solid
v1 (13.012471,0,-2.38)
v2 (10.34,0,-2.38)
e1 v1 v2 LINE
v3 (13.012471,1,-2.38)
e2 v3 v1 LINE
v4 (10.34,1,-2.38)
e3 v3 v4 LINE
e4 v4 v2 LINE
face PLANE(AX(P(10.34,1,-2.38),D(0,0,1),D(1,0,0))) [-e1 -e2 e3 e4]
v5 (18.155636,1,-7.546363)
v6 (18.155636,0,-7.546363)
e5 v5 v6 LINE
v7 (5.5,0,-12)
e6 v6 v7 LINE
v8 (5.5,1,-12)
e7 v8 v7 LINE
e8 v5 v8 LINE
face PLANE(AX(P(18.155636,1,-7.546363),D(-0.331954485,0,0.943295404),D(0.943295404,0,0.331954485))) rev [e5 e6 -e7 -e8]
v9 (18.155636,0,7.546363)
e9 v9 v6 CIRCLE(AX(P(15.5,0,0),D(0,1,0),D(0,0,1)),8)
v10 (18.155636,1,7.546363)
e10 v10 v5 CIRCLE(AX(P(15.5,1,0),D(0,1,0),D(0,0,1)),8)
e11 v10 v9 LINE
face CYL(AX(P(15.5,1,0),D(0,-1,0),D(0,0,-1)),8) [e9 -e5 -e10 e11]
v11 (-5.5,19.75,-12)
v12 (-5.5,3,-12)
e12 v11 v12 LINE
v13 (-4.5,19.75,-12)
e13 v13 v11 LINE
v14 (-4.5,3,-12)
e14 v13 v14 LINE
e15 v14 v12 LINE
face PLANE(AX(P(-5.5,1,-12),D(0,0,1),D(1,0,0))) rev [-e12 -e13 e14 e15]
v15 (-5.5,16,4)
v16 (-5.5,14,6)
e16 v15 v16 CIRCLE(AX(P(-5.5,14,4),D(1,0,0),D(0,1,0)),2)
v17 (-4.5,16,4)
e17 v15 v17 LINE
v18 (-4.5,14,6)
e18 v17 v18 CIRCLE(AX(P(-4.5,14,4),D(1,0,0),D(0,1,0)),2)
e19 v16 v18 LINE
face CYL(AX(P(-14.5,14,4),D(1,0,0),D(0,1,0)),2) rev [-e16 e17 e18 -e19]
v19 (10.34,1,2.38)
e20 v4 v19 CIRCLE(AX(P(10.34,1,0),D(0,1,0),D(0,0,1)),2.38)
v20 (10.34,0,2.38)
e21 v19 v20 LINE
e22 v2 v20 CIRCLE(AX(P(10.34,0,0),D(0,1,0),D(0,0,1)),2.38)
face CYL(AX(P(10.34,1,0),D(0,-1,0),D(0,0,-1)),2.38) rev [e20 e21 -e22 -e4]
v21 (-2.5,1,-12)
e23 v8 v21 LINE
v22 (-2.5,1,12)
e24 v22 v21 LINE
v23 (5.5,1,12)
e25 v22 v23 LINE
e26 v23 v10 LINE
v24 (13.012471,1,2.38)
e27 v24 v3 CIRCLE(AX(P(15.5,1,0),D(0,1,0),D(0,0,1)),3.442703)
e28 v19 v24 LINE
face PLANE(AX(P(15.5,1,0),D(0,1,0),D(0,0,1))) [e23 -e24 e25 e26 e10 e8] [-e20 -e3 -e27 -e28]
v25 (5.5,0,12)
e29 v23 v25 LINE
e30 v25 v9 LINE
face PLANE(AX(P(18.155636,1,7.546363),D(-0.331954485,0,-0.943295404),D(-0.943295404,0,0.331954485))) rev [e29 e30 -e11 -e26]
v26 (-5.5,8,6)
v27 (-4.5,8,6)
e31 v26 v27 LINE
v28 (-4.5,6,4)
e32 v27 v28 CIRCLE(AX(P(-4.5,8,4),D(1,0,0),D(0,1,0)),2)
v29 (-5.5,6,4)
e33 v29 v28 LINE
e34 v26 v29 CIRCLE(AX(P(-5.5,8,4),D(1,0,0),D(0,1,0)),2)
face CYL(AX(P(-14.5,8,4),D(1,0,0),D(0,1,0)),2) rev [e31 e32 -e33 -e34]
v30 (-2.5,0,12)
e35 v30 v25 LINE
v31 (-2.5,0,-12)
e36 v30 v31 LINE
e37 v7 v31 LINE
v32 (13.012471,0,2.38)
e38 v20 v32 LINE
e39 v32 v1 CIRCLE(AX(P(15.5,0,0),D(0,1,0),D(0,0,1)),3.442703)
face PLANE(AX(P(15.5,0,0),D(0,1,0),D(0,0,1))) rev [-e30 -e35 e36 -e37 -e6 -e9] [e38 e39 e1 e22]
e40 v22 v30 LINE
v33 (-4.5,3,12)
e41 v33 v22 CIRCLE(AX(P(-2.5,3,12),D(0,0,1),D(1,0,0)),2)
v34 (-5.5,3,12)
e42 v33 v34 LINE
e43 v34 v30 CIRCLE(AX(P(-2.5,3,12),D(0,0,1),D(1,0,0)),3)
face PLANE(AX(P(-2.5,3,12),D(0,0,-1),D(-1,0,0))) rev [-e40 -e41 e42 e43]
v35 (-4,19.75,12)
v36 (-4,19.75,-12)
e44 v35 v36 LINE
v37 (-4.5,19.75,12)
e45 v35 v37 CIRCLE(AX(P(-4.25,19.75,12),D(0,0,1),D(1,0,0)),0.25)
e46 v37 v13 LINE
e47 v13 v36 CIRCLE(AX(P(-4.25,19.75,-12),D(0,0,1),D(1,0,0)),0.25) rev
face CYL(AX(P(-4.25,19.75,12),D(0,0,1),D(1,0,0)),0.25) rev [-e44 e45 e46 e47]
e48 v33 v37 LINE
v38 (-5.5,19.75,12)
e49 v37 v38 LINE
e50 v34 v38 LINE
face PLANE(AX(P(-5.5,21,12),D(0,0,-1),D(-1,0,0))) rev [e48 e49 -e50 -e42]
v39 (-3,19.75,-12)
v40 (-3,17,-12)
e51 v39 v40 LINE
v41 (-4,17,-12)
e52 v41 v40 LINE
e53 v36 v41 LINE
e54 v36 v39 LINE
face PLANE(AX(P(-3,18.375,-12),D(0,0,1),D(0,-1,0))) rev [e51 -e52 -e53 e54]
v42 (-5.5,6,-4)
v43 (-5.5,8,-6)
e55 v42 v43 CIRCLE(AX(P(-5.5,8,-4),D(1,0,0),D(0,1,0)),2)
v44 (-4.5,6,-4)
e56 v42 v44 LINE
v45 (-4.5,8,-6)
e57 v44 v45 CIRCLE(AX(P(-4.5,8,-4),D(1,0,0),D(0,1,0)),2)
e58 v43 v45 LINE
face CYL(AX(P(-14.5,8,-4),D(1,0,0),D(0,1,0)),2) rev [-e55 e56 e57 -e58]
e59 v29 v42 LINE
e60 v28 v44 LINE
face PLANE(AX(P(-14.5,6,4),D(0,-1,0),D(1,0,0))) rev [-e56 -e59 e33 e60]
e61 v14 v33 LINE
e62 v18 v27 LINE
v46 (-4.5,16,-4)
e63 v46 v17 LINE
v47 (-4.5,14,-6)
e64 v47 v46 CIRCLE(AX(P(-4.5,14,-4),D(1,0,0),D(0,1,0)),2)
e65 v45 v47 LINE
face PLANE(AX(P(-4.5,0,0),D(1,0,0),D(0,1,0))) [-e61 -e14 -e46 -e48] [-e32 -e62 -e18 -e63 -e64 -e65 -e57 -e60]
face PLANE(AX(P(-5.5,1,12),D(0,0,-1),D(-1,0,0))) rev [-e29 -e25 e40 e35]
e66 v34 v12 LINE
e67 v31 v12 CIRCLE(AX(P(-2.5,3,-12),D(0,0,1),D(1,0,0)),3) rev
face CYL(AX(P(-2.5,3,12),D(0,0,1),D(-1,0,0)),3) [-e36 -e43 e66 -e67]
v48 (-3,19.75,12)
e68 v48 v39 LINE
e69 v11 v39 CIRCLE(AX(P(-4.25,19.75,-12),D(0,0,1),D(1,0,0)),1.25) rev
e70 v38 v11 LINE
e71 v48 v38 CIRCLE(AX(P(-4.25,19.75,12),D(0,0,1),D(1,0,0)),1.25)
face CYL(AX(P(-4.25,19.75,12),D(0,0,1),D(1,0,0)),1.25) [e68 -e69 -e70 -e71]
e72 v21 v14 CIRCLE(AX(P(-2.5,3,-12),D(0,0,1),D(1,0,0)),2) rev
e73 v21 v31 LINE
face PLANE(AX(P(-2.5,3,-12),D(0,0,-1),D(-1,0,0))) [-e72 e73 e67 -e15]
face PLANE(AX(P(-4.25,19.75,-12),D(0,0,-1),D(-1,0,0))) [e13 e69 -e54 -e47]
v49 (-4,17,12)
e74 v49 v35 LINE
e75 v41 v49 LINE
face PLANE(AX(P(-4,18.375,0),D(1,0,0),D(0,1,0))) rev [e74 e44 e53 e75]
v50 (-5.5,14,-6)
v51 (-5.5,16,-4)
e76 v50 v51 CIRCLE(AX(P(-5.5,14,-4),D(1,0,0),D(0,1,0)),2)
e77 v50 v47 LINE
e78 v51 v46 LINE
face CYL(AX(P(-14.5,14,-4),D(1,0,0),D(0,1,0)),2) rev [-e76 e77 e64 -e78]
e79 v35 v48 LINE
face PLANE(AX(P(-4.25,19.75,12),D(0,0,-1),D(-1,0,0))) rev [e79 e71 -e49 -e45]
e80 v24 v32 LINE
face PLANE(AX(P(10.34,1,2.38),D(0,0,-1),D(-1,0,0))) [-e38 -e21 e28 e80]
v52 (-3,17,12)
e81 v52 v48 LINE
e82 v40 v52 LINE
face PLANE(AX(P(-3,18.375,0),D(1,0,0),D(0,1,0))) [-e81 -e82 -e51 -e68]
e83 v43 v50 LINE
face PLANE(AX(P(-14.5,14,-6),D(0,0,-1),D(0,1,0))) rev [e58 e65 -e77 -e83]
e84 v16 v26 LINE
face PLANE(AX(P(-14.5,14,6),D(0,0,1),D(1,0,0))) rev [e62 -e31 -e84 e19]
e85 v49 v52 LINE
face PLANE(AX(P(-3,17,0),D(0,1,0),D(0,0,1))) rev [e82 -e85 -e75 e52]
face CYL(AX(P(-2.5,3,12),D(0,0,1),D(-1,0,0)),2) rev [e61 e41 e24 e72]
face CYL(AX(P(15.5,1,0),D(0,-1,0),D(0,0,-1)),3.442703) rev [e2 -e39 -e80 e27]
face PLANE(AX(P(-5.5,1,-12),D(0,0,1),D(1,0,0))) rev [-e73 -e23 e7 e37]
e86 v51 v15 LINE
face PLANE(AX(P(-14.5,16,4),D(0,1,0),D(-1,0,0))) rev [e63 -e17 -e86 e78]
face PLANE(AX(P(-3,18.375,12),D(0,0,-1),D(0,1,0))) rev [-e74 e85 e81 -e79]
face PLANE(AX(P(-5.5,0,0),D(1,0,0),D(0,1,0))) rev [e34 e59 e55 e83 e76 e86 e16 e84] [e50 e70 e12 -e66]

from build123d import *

# Parameters (mm, degrees)
BASE_FLANGE1_DEPTH           = 1
EDGE_FLANGE1_STRIP_W         = 8
EDGE_FLANGE1_STRIP_H         = 1
EDGE_FLANGE1_STRIP_CUT_DEPTH = 24
EDGE_FLANGE1_DEPTH           = 24
HEM1_START                   = -12
HEM1_DEPTH                   = 24
HEM1_2_DEPTH                 = 24
CUT_EXTRUDE1_DEPTH           = 10


# Read off the part's stored shape, not the designer's step: Hem1
# Sheet-metal steps are written as plain solids
with BuildPart() as part:
    # Sketch1 → Base-Flange1 (new body)
    with BuildSketch(Plane(origin=(0, 0, 0), x_dir=(1, 0, 0), z_dir=(0, 1, 0))):
        with BuildLine():
            Line((-5.5, 12), (5.5, 12))
            Line((5.5, 12), (18.155635881, 7.546363234))
            ThreePointArc((18.155635881, 7.546363234), (23.5, 0), (18.155635881, -7.546363234))
            Line((18.155635881, -7.546363234), (5.5, -12))
            Line((5.5, -12), (-5.5, -12))
            Line((-5.5, -12), (-5.5, 12))
        make_face()
        with BuildLine():
            Line((10.34, 2.38), (13.012470906, 2.38))
            ThreePointArc((13.012470906, 2.38), (18.942702571, 0), (13.012470906, -2.38))
            Line((13.012470906, -2.38), (10.34, -2.38))
            ThreePointArc((10.34, -2.38), (7.96, 0), (10.34, 2.38))
        make_face(mode=Mode.SUBTRACT)
    extrude(amount=BASE_FLANGE1_DEPTH)

    # Edge-Flange1 strip (across the edge) → Edge-Flange1 strip cut (cut)
    with BuildSketch(Plane(origin=(-5.5, 1, -12), x_dir=(1, 0, 0), z_dir=(0, 0, 1))):
        with Locations((-1, -0.5)):
            Rectangle(EDGE_FLANGE1_STRIP_W, EDGE_FLANGE1_STRIP_H)
    extrude(amount=EDGE_FLANGE1_STRIP_CUT_DEPTH, mode=Mode.SUBTRACT)

    # Edge-Flange1 section (across the edge) → Edge-Flange1 (add)
    with BuildSketch(Plane(origin=(-5.5, 1, -12), x_dir=(1, 0, 0), z_dir=(0, 0, 1))):
        with BuildLine():
            Line((0, 2), (0, 20))
            Line((0, 20), (1, 20))
            Line((1, 20), (1, 2))
            ThreePointArc((1, 2), (1.585786438, 0.585786438), (3, 0))
            Line((3, 0), (3, -1))
            ThreePointArc((3, -1), (0.878679656, -0.121320344), (0, 2))
        make_face()
    extrude(amount=EDGE_FLANGE1_DEPTH)

    # Hem1 outline → Hem1 (cut)
    with BuildSketch(Plane.XY.offset(HEM1_START)):
        with BuildLine():
            ThreePointArc((-5.5, 19.75), (-5.218245837, 20.540569415), (-4.5, 20.974744871))
            Line((-4.5, 20.974744871), (-4.5, 21))
            Line((-4.5, 21), (-5.5, 21))
            Line((-5.5, 21), (-5.5, 19.75))
        make_face()
    extrude(amount=HEM1_DEPTH, mode=Mode.SUBTRACT)

    # Hem1 2 outline → Hem1 2 (add)
    with BuildSketch(Plane.XY.offset(HEM1_START)):
        with BuildLine():
            Line((-4, 17), (-3, 17))
            Line((-3, 17), (-3, 19.75))
            ThreePointArc((-3, 19.75), (-3.459430585, 20.718245837), (-4.5, 20.974744871))
            Line((-4.5, 20.974744871), (-4.5, 19.75))
            ThreePointArc((-4.5, 19.75), (-4.25, 20), (-4, 19.75))
            Line((-4, 19.75), (-4, 17))
        make_face()
    extrude(amount=HEM1_2_DEPTH)

    # Sketch11 → Cut-Extrude1 (cut)
    with BuildSketch(Plane(origin=(-4.5, 0, 0), x_dir=(0, 0, -1), z_dir=(1, 0, 0))):
        with BuildLine():
            Line((-4, 16), (4, 16))
            ThreePointArc((4, 16), (5.414213562, 15.414213562), (6, 14))
            Line((6, 14), (6, 8))
            ThreePointArc((6, 8), (5.414213562, 6.585786438), (4, 6))
            Line((4, 6), (-4, 6))
            ThreePointArc((-4, 6), (-5.414213562, 6.585786438), (-6, 8))
            Line((-6, 8), (-6, 14))
            ThreePointArc((-6, 14), (-5.414213562, 15.414213562), (-4, 16))
        make_face()
    extrude(amount=-CUT_EXTRUDE1_DEPTH, mode=Mode.SUBTRACT)


solid = part.part
